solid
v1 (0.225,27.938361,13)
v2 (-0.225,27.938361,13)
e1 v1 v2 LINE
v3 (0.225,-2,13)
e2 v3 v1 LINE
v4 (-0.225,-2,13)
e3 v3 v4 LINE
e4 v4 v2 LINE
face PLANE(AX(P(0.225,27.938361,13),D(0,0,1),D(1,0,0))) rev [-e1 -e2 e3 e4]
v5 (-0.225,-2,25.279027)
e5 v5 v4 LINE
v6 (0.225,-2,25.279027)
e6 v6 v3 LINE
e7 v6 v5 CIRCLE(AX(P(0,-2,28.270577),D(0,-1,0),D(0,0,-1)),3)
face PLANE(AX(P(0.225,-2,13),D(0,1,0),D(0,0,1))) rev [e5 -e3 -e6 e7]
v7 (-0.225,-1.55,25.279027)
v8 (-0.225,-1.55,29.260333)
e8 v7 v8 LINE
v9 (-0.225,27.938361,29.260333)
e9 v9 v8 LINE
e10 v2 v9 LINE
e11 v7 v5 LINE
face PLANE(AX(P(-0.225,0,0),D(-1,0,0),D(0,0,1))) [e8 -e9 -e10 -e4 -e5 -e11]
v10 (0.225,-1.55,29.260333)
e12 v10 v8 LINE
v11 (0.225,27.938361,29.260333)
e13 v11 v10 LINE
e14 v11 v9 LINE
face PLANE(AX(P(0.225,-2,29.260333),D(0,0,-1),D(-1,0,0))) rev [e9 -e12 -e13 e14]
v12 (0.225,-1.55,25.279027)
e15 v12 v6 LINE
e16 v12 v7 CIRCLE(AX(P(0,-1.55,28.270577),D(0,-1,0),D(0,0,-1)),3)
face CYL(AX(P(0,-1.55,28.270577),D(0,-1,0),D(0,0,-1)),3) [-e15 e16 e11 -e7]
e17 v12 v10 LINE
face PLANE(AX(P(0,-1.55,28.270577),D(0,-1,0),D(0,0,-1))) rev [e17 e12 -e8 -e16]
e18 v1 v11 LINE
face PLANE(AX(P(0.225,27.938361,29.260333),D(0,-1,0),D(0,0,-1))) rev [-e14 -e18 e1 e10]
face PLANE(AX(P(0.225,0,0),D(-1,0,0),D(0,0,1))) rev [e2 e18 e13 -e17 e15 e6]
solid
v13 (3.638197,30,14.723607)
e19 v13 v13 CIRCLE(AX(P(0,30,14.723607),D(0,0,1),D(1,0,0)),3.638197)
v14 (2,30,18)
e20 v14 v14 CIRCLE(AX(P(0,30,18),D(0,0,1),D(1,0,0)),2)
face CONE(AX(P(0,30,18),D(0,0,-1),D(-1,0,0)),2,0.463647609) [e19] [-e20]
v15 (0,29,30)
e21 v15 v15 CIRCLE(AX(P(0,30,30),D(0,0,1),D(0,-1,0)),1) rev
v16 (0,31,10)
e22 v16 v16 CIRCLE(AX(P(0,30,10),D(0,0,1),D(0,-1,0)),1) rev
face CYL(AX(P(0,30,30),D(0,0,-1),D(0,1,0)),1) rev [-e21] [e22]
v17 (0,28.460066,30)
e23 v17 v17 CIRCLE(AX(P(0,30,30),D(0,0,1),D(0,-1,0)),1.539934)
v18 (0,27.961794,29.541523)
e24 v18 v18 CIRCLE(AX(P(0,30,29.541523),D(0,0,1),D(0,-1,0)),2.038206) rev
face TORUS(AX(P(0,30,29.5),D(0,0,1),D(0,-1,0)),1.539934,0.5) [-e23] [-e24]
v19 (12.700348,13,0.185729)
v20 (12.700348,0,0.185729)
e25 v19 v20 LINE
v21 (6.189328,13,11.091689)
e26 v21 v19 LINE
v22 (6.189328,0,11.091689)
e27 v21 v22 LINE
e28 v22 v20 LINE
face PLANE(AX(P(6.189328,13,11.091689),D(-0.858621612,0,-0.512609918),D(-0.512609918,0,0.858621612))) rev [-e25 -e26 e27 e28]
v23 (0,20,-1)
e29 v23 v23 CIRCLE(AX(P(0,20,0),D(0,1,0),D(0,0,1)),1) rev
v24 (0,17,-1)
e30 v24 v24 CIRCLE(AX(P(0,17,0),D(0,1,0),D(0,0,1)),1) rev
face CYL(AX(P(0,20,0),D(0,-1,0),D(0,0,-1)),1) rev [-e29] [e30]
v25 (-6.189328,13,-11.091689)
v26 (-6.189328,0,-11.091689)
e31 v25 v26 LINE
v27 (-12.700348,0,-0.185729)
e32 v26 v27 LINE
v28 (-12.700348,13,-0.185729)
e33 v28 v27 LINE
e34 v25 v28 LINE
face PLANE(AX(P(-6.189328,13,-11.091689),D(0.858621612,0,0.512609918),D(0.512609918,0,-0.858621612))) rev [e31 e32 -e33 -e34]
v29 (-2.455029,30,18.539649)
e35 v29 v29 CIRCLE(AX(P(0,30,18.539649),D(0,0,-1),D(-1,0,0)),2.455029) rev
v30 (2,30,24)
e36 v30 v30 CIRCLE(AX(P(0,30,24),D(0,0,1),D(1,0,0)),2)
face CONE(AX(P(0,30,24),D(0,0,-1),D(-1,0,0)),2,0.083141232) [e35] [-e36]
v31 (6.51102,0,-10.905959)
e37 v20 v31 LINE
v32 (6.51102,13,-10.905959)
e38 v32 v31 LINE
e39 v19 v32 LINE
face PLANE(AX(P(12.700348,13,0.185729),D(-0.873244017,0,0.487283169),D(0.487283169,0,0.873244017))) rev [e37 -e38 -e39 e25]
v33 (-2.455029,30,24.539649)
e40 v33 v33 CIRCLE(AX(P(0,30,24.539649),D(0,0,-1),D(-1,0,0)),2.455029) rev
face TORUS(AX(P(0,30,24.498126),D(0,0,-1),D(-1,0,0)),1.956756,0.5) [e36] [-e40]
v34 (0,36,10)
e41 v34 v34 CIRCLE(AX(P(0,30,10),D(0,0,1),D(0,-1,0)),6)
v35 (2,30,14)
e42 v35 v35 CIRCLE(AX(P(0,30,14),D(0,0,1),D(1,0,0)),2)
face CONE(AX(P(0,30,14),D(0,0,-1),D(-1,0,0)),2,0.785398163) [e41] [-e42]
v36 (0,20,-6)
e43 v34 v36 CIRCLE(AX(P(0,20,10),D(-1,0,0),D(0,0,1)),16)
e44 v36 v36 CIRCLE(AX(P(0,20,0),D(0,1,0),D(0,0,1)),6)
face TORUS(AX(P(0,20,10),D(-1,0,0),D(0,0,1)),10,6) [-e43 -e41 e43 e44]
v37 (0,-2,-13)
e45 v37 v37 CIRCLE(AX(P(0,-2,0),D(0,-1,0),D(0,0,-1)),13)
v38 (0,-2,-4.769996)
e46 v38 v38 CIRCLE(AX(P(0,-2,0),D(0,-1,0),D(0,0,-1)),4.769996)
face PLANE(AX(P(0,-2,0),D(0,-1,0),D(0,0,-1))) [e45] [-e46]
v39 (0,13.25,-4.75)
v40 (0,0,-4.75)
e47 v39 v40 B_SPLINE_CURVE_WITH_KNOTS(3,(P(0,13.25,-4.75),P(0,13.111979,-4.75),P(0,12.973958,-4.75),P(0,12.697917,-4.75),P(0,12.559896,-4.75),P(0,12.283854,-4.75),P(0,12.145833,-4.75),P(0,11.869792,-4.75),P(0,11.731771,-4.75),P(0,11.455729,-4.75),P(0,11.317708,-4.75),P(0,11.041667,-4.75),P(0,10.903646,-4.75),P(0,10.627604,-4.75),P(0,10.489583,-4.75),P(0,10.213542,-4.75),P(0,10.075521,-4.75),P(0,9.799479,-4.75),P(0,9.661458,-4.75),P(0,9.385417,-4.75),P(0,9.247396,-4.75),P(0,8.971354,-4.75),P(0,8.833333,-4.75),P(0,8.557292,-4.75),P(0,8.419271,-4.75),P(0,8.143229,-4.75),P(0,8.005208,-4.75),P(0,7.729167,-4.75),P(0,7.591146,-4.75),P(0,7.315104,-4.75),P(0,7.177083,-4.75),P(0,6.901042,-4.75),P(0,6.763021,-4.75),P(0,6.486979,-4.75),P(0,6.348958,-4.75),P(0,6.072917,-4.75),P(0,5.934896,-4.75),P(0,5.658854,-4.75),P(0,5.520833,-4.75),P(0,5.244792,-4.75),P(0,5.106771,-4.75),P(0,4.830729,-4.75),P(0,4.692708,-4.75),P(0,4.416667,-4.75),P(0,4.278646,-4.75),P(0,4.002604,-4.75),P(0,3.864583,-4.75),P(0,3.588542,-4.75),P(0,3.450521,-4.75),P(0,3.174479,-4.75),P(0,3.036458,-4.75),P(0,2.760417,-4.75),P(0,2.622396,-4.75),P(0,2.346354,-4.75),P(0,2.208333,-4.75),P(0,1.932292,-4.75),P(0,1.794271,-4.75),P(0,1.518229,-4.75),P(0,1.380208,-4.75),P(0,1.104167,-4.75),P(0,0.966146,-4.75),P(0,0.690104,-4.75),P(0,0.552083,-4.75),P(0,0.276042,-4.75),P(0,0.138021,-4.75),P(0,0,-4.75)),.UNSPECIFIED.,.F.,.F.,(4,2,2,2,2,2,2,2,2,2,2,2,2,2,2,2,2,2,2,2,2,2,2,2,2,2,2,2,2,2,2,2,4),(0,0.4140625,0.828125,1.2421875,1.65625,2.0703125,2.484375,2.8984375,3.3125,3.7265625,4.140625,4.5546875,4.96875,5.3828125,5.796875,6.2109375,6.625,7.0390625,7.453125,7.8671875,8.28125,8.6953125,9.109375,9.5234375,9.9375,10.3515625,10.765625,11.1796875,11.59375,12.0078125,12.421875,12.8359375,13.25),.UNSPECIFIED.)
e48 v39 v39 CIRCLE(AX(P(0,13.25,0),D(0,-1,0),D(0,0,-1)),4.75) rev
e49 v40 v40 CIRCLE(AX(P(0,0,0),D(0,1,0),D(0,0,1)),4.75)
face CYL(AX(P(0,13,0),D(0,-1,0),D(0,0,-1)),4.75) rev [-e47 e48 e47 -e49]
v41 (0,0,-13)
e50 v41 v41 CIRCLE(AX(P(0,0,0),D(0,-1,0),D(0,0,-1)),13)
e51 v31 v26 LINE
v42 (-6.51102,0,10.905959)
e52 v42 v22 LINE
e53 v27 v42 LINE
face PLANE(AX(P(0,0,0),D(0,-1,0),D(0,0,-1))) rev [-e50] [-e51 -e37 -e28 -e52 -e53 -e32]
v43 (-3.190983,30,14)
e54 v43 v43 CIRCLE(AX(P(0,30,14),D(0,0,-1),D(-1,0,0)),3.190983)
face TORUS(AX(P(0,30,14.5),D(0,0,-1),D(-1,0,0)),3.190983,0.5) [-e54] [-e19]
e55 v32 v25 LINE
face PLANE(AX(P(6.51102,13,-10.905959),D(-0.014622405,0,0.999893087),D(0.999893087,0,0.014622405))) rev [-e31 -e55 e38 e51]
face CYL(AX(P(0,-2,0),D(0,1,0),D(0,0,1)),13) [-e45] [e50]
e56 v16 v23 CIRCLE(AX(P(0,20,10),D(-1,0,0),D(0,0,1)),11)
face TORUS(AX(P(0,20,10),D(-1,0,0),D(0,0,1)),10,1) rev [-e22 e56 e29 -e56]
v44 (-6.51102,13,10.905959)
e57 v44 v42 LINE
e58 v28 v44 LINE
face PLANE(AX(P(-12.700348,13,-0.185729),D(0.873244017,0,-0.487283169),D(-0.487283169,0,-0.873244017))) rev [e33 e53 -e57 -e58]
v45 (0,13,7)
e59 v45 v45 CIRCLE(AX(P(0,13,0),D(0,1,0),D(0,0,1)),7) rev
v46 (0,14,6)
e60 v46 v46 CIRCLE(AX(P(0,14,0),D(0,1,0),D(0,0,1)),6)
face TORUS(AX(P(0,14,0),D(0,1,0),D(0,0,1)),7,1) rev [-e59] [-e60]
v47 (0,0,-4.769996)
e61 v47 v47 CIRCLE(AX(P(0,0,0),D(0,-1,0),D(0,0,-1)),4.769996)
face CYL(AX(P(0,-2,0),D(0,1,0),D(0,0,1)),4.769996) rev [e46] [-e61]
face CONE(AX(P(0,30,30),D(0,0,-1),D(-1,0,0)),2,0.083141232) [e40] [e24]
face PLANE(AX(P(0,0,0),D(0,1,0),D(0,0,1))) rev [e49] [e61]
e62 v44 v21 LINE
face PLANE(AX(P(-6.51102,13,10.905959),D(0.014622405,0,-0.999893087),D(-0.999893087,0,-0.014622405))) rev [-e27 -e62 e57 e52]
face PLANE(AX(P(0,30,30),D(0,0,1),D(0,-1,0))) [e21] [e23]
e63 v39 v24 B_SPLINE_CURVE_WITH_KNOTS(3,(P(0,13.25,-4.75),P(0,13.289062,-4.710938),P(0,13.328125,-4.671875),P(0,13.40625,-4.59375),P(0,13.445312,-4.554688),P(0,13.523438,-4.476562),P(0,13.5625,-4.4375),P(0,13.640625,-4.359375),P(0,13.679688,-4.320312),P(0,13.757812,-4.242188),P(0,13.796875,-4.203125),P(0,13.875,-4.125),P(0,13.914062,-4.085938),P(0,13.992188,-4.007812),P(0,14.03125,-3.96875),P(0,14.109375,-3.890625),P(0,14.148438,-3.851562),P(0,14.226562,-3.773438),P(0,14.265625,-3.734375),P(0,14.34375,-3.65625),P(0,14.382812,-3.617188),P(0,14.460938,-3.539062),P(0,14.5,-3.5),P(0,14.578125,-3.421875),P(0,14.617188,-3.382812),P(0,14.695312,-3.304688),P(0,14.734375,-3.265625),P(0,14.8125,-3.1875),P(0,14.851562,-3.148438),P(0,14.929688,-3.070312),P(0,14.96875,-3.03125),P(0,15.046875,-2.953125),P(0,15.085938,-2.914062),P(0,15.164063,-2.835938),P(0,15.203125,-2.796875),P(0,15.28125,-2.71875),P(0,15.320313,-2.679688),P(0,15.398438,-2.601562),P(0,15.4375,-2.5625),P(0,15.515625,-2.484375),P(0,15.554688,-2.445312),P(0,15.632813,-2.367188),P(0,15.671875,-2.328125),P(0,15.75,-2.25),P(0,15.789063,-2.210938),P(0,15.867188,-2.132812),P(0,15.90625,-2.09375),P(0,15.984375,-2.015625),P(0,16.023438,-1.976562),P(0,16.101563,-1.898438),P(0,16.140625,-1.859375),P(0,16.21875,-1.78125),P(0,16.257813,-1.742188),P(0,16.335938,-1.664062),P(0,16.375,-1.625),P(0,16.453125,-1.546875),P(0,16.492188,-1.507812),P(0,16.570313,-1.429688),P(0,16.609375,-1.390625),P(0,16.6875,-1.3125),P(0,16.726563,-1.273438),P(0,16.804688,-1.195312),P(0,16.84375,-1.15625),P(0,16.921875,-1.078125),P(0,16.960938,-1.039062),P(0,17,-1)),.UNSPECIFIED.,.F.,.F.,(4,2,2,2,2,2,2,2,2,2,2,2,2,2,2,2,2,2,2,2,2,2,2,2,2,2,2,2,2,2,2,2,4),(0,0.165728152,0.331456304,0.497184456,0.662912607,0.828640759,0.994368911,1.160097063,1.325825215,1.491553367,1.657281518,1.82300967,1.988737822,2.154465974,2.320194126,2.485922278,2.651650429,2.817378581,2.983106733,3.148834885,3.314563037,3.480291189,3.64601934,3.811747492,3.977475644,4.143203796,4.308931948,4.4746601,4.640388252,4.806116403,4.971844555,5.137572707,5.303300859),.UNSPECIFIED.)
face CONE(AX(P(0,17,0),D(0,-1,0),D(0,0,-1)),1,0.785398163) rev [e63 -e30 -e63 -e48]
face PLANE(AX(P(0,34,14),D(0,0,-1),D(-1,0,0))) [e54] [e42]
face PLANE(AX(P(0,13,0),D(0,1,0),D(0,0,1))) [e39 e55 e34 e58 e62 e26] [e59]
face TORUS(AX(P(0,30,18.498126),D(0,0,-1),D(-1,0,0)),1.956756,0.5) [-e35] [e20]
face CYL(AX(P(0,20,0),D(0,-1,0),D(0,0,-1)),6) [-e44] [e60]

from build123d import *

# Parameters (mm, degrees)
SKETCH_1_R      = 4.75
EXTRUDE_1_DEPTH = 13
SKETCH_2_R      = 13
SKETCH_2_R_2    = 4.76999632
EXTRUDE_2_DEPTH = 2
SKETCH_4_R      = 6
SKETCH_4_R_2    = 1
FILLET_1_R      = 1
CHAMFER_1_SIZE  = 4
FILLET_2_R      = 0.5
SKETCH_6_W      = 16.260333428
SKETCH_6_H      = 29.938361119
EXTRUDE_4_DEPTH = 0.225
SKETCH_7_R      = 3
EXTRUDE_5_DEPTH = 0.45


with BuildPart() as part:
    # Эскиз1 → Бобышка-Вытянуть1 (new body)
    with BuildSketch(Plane(origin=(0, 0, 0), x_dir=(1, 0, 0), z_dir=(0, 1, 0))):
        Polygon((6.511020426, 10.905959213), (-6.189327518, 11.091688699), (-12.700347944, 0.185729487), (-6.511020426, -10.905959213), (6.189327518, -11.091688699), (12.700347944, -0.185729487), align=None)
        with Locations(Location((0, 0, 0), (0, 0, 90))):
            Circle(SKETCH_1_R, mode=Mode.SUBTRACT)
    extrude(amount=EXTRUDE_1_DEPTH)

    # Эскиз2 → Бобышка-Вытянуть2 (add)
    with BuildSketch(Plane.XZ):
        with Locations(Location((0, 0, 0), (0, 0, 270))):
            Circle(SKETCH_2_R)
        with Locations(Location((0, 0, 0), (0, 0, 270))):
            Circle(SKETCH_2_R_2, mode=Mode.SUBTRACT)
    extrude(amount=EXTRUDE_2_DEPTH)

    # По траектории1: sweep along a path in Эскиз3
    with BuildLine(Plane(origin=(0, 0, 0), x_dir=(0, 0, -1), z_dir=(1, 0, 0))) as sweep_1_path:
        Line((-30, 30), (-10, 30))
        ThreePointArc((-10, 30), (-2.928932188, 27.071067812), (0, 20))
        Line((0, 20), (0, 13))
    # Эскиз4 → По траектории1 (sweep)
    with BuildSketch(Plane(origin=(0, 13, 0), x_dir=(1, 0, 0), z_dir=(0, 1, 0))):
        Circle(SKETCH_4_R)
        Circle(SKETCH_4_R_2, mode=Mode.SUBTRACT)
    sweep(path=sweep_1_path.line)

    # Скругление1
    fillet_1_edges = [part.edges().sort_by_distance(p)[0] for p in [
        (-6, 13, 0),
    ]]
    fillet(fillet_1_edges, radius=FILLET_1_R)

    # Фаска1
    # the kernel refuses this chamfer: 4 mm, written as the material it takes off along each edge
    with BuildSketch(Plane(origin=(0, 13, 0), x_dir=(1, 0, 0), z_dir=(0, 0, -1))) as chamfer_1_piece_1_section:
        Polygon((1, -CHAMFER_1_SIZE), (1 + CHAMFER_1_SIZE, 0), (1, 0), align=None)
    chamfer_1_piece_1 = revolve(axis=Axis((0, 13, 0), (0, -1, 0)), mode=Mode.PRIVATE)
    chamfer_1_piece_1 = chamfer_1_piece_1 & Plane(origin=(0, 15.146163681, 0), x_dir=(0, 0, -1), z_dir=(0, -1, 0)) * Cylinder(4.75, 20, mode=Mode.PRIVATE)
    add(chamfer_1_piece_1, mode=Mode.SUBTRACT)

    # Эскиз5 → Вырез-Повернуть1 (revolve, cut)
    with BuildSketch(Plane(origin=(0, 0, 0), x_dir=(0, 0, -1), z_dir=(1, 0, 0)), mode=Mode.PRIVATE) as cut_revolve_1_sk:
        Polygon((-30, 32), (-24, 32.5), (-24, 32), (-18, 32.5), (-18, 32), (-14, 34), (-14, 32), (-10, 36), (-30, 36), align=None)
    revolve(cut_revolve_1_sk.sketch.rotate(Axis((0, 30, 30), (0, 0, -1)), 90), axis=Axis((0, 30, 30), (0, 0, -1)), mode=Mode.SUBTRACT)

    # Скругление2
    # the kernel refuses this fillet: 0.5 mm, written as the material it takes off along each edge
    with BuildSketch(Plane(origin=(0, 30, 14), x_dir=(1, 0, 0), z_dir=(0, 1, 0))) as fillet_2_piece_1:
        with BuildLine():
            CenterArc((4 - FILLET_2_R * 1.61803398875, -FILLET_2_R), FILLET_2_R, 333.434948823, 116.565051177)
            Line((4 - FILLET_2_R * 0.72360679775, -FILLET_2_R * 1.4472135955), (4, 0))
            Line((4, 0), (4 - FILLET_2_R * 1.61803398875, 0))
        make_face()
    revolve(axis=Axis((0, 30, 14), (0, 0, -1)), mode=Mode.SUBTRACT)
    with BuildSketch(Plane(origin=(0, 30, 18), x_dir=(1, 0, 0), z_dir=(0, 1, 0))) as fillet_2_piece_2:
        with BuildLine():
            CenterArc((1.956756353, -0.498126477), FILLET_2_R, 355.236358309, 89.802086132)
            Line((2.455029232, -0.539649217), (2.5, 0))
            Line((2.5, 0), (2, 0))
        make_face()
    revolve(axis=Axis((0, 30, 18), (0, 0, -1)), mode=Mode.SUBTRACT)
    with BuildSketch(Plane(origin=(0, 30, 24), x_dir=(1, 0, 0), z_dir=(0, 1, 0))) as fillet_2_piece_3:
        with BuildLine():
            CenterArc((1.956756353, -0.498126477), FILLET_2_R, 355.236358309, 89.802086132)
            Line((2.455029232, -0.539649217), (2.5, 0))
            Line((2.5, 0), (2, 0))
        make_face()
    revolve(axis=Axis((0, 30, 24), (0, 0, -1)), mode=Mode.SUBTRACT)
    with BuildSketch(Plane(origin=(0, 30, 30), x_dir=(1, 0, 0), z_dir=(0, 1, 0))) as fillet_2_piece_4:
        with BuildLine():
            CenterArc((2 - FILLET_2_R * 0.920132881566, FILLET_2_R), FILLET_2_R, 270, 85.236358309)
            Line((2 - FILLET_2_R * 0.920132881566, 0), (2, 0))
            Line((2, 0), (2 + FILLET_2_R * 0.0764128766789, FILLET_2_R * 0.916954520146))
        make_face()
    revolve(axis=Axis((0, 30, 30), (0, 0, -1)), mode=Mode.SUBTRACT)


with BuildPart() as body_2:
    # Эскиз6 → Бобышка-Вытянуть4 (new, symmetric)
    with BuildSketch(Plane(origin=(0, 0, 0), x_dir=(0, 0, -1), z_dir=(1, 0, 0))):
        with Locations((-21.130166714, 12.96918056)):
            Rectangle(SKETCH_6_W, SKETCH_6_H)
    extrude(amount=EXTRUDE_4_DEPTH, both=True)

    # Эскиз7 → Бобышка-Вытянуть5 (add)
    with BuildSketch(Plane.XZ.offset(2)):
        with Locations((0, 28.270577409)):
            Circle(SKETCH_7_R)
    extrude(amount=-EXTRUDE_5_DEPTH)


solid = Compound([part.part, body_2.part])
